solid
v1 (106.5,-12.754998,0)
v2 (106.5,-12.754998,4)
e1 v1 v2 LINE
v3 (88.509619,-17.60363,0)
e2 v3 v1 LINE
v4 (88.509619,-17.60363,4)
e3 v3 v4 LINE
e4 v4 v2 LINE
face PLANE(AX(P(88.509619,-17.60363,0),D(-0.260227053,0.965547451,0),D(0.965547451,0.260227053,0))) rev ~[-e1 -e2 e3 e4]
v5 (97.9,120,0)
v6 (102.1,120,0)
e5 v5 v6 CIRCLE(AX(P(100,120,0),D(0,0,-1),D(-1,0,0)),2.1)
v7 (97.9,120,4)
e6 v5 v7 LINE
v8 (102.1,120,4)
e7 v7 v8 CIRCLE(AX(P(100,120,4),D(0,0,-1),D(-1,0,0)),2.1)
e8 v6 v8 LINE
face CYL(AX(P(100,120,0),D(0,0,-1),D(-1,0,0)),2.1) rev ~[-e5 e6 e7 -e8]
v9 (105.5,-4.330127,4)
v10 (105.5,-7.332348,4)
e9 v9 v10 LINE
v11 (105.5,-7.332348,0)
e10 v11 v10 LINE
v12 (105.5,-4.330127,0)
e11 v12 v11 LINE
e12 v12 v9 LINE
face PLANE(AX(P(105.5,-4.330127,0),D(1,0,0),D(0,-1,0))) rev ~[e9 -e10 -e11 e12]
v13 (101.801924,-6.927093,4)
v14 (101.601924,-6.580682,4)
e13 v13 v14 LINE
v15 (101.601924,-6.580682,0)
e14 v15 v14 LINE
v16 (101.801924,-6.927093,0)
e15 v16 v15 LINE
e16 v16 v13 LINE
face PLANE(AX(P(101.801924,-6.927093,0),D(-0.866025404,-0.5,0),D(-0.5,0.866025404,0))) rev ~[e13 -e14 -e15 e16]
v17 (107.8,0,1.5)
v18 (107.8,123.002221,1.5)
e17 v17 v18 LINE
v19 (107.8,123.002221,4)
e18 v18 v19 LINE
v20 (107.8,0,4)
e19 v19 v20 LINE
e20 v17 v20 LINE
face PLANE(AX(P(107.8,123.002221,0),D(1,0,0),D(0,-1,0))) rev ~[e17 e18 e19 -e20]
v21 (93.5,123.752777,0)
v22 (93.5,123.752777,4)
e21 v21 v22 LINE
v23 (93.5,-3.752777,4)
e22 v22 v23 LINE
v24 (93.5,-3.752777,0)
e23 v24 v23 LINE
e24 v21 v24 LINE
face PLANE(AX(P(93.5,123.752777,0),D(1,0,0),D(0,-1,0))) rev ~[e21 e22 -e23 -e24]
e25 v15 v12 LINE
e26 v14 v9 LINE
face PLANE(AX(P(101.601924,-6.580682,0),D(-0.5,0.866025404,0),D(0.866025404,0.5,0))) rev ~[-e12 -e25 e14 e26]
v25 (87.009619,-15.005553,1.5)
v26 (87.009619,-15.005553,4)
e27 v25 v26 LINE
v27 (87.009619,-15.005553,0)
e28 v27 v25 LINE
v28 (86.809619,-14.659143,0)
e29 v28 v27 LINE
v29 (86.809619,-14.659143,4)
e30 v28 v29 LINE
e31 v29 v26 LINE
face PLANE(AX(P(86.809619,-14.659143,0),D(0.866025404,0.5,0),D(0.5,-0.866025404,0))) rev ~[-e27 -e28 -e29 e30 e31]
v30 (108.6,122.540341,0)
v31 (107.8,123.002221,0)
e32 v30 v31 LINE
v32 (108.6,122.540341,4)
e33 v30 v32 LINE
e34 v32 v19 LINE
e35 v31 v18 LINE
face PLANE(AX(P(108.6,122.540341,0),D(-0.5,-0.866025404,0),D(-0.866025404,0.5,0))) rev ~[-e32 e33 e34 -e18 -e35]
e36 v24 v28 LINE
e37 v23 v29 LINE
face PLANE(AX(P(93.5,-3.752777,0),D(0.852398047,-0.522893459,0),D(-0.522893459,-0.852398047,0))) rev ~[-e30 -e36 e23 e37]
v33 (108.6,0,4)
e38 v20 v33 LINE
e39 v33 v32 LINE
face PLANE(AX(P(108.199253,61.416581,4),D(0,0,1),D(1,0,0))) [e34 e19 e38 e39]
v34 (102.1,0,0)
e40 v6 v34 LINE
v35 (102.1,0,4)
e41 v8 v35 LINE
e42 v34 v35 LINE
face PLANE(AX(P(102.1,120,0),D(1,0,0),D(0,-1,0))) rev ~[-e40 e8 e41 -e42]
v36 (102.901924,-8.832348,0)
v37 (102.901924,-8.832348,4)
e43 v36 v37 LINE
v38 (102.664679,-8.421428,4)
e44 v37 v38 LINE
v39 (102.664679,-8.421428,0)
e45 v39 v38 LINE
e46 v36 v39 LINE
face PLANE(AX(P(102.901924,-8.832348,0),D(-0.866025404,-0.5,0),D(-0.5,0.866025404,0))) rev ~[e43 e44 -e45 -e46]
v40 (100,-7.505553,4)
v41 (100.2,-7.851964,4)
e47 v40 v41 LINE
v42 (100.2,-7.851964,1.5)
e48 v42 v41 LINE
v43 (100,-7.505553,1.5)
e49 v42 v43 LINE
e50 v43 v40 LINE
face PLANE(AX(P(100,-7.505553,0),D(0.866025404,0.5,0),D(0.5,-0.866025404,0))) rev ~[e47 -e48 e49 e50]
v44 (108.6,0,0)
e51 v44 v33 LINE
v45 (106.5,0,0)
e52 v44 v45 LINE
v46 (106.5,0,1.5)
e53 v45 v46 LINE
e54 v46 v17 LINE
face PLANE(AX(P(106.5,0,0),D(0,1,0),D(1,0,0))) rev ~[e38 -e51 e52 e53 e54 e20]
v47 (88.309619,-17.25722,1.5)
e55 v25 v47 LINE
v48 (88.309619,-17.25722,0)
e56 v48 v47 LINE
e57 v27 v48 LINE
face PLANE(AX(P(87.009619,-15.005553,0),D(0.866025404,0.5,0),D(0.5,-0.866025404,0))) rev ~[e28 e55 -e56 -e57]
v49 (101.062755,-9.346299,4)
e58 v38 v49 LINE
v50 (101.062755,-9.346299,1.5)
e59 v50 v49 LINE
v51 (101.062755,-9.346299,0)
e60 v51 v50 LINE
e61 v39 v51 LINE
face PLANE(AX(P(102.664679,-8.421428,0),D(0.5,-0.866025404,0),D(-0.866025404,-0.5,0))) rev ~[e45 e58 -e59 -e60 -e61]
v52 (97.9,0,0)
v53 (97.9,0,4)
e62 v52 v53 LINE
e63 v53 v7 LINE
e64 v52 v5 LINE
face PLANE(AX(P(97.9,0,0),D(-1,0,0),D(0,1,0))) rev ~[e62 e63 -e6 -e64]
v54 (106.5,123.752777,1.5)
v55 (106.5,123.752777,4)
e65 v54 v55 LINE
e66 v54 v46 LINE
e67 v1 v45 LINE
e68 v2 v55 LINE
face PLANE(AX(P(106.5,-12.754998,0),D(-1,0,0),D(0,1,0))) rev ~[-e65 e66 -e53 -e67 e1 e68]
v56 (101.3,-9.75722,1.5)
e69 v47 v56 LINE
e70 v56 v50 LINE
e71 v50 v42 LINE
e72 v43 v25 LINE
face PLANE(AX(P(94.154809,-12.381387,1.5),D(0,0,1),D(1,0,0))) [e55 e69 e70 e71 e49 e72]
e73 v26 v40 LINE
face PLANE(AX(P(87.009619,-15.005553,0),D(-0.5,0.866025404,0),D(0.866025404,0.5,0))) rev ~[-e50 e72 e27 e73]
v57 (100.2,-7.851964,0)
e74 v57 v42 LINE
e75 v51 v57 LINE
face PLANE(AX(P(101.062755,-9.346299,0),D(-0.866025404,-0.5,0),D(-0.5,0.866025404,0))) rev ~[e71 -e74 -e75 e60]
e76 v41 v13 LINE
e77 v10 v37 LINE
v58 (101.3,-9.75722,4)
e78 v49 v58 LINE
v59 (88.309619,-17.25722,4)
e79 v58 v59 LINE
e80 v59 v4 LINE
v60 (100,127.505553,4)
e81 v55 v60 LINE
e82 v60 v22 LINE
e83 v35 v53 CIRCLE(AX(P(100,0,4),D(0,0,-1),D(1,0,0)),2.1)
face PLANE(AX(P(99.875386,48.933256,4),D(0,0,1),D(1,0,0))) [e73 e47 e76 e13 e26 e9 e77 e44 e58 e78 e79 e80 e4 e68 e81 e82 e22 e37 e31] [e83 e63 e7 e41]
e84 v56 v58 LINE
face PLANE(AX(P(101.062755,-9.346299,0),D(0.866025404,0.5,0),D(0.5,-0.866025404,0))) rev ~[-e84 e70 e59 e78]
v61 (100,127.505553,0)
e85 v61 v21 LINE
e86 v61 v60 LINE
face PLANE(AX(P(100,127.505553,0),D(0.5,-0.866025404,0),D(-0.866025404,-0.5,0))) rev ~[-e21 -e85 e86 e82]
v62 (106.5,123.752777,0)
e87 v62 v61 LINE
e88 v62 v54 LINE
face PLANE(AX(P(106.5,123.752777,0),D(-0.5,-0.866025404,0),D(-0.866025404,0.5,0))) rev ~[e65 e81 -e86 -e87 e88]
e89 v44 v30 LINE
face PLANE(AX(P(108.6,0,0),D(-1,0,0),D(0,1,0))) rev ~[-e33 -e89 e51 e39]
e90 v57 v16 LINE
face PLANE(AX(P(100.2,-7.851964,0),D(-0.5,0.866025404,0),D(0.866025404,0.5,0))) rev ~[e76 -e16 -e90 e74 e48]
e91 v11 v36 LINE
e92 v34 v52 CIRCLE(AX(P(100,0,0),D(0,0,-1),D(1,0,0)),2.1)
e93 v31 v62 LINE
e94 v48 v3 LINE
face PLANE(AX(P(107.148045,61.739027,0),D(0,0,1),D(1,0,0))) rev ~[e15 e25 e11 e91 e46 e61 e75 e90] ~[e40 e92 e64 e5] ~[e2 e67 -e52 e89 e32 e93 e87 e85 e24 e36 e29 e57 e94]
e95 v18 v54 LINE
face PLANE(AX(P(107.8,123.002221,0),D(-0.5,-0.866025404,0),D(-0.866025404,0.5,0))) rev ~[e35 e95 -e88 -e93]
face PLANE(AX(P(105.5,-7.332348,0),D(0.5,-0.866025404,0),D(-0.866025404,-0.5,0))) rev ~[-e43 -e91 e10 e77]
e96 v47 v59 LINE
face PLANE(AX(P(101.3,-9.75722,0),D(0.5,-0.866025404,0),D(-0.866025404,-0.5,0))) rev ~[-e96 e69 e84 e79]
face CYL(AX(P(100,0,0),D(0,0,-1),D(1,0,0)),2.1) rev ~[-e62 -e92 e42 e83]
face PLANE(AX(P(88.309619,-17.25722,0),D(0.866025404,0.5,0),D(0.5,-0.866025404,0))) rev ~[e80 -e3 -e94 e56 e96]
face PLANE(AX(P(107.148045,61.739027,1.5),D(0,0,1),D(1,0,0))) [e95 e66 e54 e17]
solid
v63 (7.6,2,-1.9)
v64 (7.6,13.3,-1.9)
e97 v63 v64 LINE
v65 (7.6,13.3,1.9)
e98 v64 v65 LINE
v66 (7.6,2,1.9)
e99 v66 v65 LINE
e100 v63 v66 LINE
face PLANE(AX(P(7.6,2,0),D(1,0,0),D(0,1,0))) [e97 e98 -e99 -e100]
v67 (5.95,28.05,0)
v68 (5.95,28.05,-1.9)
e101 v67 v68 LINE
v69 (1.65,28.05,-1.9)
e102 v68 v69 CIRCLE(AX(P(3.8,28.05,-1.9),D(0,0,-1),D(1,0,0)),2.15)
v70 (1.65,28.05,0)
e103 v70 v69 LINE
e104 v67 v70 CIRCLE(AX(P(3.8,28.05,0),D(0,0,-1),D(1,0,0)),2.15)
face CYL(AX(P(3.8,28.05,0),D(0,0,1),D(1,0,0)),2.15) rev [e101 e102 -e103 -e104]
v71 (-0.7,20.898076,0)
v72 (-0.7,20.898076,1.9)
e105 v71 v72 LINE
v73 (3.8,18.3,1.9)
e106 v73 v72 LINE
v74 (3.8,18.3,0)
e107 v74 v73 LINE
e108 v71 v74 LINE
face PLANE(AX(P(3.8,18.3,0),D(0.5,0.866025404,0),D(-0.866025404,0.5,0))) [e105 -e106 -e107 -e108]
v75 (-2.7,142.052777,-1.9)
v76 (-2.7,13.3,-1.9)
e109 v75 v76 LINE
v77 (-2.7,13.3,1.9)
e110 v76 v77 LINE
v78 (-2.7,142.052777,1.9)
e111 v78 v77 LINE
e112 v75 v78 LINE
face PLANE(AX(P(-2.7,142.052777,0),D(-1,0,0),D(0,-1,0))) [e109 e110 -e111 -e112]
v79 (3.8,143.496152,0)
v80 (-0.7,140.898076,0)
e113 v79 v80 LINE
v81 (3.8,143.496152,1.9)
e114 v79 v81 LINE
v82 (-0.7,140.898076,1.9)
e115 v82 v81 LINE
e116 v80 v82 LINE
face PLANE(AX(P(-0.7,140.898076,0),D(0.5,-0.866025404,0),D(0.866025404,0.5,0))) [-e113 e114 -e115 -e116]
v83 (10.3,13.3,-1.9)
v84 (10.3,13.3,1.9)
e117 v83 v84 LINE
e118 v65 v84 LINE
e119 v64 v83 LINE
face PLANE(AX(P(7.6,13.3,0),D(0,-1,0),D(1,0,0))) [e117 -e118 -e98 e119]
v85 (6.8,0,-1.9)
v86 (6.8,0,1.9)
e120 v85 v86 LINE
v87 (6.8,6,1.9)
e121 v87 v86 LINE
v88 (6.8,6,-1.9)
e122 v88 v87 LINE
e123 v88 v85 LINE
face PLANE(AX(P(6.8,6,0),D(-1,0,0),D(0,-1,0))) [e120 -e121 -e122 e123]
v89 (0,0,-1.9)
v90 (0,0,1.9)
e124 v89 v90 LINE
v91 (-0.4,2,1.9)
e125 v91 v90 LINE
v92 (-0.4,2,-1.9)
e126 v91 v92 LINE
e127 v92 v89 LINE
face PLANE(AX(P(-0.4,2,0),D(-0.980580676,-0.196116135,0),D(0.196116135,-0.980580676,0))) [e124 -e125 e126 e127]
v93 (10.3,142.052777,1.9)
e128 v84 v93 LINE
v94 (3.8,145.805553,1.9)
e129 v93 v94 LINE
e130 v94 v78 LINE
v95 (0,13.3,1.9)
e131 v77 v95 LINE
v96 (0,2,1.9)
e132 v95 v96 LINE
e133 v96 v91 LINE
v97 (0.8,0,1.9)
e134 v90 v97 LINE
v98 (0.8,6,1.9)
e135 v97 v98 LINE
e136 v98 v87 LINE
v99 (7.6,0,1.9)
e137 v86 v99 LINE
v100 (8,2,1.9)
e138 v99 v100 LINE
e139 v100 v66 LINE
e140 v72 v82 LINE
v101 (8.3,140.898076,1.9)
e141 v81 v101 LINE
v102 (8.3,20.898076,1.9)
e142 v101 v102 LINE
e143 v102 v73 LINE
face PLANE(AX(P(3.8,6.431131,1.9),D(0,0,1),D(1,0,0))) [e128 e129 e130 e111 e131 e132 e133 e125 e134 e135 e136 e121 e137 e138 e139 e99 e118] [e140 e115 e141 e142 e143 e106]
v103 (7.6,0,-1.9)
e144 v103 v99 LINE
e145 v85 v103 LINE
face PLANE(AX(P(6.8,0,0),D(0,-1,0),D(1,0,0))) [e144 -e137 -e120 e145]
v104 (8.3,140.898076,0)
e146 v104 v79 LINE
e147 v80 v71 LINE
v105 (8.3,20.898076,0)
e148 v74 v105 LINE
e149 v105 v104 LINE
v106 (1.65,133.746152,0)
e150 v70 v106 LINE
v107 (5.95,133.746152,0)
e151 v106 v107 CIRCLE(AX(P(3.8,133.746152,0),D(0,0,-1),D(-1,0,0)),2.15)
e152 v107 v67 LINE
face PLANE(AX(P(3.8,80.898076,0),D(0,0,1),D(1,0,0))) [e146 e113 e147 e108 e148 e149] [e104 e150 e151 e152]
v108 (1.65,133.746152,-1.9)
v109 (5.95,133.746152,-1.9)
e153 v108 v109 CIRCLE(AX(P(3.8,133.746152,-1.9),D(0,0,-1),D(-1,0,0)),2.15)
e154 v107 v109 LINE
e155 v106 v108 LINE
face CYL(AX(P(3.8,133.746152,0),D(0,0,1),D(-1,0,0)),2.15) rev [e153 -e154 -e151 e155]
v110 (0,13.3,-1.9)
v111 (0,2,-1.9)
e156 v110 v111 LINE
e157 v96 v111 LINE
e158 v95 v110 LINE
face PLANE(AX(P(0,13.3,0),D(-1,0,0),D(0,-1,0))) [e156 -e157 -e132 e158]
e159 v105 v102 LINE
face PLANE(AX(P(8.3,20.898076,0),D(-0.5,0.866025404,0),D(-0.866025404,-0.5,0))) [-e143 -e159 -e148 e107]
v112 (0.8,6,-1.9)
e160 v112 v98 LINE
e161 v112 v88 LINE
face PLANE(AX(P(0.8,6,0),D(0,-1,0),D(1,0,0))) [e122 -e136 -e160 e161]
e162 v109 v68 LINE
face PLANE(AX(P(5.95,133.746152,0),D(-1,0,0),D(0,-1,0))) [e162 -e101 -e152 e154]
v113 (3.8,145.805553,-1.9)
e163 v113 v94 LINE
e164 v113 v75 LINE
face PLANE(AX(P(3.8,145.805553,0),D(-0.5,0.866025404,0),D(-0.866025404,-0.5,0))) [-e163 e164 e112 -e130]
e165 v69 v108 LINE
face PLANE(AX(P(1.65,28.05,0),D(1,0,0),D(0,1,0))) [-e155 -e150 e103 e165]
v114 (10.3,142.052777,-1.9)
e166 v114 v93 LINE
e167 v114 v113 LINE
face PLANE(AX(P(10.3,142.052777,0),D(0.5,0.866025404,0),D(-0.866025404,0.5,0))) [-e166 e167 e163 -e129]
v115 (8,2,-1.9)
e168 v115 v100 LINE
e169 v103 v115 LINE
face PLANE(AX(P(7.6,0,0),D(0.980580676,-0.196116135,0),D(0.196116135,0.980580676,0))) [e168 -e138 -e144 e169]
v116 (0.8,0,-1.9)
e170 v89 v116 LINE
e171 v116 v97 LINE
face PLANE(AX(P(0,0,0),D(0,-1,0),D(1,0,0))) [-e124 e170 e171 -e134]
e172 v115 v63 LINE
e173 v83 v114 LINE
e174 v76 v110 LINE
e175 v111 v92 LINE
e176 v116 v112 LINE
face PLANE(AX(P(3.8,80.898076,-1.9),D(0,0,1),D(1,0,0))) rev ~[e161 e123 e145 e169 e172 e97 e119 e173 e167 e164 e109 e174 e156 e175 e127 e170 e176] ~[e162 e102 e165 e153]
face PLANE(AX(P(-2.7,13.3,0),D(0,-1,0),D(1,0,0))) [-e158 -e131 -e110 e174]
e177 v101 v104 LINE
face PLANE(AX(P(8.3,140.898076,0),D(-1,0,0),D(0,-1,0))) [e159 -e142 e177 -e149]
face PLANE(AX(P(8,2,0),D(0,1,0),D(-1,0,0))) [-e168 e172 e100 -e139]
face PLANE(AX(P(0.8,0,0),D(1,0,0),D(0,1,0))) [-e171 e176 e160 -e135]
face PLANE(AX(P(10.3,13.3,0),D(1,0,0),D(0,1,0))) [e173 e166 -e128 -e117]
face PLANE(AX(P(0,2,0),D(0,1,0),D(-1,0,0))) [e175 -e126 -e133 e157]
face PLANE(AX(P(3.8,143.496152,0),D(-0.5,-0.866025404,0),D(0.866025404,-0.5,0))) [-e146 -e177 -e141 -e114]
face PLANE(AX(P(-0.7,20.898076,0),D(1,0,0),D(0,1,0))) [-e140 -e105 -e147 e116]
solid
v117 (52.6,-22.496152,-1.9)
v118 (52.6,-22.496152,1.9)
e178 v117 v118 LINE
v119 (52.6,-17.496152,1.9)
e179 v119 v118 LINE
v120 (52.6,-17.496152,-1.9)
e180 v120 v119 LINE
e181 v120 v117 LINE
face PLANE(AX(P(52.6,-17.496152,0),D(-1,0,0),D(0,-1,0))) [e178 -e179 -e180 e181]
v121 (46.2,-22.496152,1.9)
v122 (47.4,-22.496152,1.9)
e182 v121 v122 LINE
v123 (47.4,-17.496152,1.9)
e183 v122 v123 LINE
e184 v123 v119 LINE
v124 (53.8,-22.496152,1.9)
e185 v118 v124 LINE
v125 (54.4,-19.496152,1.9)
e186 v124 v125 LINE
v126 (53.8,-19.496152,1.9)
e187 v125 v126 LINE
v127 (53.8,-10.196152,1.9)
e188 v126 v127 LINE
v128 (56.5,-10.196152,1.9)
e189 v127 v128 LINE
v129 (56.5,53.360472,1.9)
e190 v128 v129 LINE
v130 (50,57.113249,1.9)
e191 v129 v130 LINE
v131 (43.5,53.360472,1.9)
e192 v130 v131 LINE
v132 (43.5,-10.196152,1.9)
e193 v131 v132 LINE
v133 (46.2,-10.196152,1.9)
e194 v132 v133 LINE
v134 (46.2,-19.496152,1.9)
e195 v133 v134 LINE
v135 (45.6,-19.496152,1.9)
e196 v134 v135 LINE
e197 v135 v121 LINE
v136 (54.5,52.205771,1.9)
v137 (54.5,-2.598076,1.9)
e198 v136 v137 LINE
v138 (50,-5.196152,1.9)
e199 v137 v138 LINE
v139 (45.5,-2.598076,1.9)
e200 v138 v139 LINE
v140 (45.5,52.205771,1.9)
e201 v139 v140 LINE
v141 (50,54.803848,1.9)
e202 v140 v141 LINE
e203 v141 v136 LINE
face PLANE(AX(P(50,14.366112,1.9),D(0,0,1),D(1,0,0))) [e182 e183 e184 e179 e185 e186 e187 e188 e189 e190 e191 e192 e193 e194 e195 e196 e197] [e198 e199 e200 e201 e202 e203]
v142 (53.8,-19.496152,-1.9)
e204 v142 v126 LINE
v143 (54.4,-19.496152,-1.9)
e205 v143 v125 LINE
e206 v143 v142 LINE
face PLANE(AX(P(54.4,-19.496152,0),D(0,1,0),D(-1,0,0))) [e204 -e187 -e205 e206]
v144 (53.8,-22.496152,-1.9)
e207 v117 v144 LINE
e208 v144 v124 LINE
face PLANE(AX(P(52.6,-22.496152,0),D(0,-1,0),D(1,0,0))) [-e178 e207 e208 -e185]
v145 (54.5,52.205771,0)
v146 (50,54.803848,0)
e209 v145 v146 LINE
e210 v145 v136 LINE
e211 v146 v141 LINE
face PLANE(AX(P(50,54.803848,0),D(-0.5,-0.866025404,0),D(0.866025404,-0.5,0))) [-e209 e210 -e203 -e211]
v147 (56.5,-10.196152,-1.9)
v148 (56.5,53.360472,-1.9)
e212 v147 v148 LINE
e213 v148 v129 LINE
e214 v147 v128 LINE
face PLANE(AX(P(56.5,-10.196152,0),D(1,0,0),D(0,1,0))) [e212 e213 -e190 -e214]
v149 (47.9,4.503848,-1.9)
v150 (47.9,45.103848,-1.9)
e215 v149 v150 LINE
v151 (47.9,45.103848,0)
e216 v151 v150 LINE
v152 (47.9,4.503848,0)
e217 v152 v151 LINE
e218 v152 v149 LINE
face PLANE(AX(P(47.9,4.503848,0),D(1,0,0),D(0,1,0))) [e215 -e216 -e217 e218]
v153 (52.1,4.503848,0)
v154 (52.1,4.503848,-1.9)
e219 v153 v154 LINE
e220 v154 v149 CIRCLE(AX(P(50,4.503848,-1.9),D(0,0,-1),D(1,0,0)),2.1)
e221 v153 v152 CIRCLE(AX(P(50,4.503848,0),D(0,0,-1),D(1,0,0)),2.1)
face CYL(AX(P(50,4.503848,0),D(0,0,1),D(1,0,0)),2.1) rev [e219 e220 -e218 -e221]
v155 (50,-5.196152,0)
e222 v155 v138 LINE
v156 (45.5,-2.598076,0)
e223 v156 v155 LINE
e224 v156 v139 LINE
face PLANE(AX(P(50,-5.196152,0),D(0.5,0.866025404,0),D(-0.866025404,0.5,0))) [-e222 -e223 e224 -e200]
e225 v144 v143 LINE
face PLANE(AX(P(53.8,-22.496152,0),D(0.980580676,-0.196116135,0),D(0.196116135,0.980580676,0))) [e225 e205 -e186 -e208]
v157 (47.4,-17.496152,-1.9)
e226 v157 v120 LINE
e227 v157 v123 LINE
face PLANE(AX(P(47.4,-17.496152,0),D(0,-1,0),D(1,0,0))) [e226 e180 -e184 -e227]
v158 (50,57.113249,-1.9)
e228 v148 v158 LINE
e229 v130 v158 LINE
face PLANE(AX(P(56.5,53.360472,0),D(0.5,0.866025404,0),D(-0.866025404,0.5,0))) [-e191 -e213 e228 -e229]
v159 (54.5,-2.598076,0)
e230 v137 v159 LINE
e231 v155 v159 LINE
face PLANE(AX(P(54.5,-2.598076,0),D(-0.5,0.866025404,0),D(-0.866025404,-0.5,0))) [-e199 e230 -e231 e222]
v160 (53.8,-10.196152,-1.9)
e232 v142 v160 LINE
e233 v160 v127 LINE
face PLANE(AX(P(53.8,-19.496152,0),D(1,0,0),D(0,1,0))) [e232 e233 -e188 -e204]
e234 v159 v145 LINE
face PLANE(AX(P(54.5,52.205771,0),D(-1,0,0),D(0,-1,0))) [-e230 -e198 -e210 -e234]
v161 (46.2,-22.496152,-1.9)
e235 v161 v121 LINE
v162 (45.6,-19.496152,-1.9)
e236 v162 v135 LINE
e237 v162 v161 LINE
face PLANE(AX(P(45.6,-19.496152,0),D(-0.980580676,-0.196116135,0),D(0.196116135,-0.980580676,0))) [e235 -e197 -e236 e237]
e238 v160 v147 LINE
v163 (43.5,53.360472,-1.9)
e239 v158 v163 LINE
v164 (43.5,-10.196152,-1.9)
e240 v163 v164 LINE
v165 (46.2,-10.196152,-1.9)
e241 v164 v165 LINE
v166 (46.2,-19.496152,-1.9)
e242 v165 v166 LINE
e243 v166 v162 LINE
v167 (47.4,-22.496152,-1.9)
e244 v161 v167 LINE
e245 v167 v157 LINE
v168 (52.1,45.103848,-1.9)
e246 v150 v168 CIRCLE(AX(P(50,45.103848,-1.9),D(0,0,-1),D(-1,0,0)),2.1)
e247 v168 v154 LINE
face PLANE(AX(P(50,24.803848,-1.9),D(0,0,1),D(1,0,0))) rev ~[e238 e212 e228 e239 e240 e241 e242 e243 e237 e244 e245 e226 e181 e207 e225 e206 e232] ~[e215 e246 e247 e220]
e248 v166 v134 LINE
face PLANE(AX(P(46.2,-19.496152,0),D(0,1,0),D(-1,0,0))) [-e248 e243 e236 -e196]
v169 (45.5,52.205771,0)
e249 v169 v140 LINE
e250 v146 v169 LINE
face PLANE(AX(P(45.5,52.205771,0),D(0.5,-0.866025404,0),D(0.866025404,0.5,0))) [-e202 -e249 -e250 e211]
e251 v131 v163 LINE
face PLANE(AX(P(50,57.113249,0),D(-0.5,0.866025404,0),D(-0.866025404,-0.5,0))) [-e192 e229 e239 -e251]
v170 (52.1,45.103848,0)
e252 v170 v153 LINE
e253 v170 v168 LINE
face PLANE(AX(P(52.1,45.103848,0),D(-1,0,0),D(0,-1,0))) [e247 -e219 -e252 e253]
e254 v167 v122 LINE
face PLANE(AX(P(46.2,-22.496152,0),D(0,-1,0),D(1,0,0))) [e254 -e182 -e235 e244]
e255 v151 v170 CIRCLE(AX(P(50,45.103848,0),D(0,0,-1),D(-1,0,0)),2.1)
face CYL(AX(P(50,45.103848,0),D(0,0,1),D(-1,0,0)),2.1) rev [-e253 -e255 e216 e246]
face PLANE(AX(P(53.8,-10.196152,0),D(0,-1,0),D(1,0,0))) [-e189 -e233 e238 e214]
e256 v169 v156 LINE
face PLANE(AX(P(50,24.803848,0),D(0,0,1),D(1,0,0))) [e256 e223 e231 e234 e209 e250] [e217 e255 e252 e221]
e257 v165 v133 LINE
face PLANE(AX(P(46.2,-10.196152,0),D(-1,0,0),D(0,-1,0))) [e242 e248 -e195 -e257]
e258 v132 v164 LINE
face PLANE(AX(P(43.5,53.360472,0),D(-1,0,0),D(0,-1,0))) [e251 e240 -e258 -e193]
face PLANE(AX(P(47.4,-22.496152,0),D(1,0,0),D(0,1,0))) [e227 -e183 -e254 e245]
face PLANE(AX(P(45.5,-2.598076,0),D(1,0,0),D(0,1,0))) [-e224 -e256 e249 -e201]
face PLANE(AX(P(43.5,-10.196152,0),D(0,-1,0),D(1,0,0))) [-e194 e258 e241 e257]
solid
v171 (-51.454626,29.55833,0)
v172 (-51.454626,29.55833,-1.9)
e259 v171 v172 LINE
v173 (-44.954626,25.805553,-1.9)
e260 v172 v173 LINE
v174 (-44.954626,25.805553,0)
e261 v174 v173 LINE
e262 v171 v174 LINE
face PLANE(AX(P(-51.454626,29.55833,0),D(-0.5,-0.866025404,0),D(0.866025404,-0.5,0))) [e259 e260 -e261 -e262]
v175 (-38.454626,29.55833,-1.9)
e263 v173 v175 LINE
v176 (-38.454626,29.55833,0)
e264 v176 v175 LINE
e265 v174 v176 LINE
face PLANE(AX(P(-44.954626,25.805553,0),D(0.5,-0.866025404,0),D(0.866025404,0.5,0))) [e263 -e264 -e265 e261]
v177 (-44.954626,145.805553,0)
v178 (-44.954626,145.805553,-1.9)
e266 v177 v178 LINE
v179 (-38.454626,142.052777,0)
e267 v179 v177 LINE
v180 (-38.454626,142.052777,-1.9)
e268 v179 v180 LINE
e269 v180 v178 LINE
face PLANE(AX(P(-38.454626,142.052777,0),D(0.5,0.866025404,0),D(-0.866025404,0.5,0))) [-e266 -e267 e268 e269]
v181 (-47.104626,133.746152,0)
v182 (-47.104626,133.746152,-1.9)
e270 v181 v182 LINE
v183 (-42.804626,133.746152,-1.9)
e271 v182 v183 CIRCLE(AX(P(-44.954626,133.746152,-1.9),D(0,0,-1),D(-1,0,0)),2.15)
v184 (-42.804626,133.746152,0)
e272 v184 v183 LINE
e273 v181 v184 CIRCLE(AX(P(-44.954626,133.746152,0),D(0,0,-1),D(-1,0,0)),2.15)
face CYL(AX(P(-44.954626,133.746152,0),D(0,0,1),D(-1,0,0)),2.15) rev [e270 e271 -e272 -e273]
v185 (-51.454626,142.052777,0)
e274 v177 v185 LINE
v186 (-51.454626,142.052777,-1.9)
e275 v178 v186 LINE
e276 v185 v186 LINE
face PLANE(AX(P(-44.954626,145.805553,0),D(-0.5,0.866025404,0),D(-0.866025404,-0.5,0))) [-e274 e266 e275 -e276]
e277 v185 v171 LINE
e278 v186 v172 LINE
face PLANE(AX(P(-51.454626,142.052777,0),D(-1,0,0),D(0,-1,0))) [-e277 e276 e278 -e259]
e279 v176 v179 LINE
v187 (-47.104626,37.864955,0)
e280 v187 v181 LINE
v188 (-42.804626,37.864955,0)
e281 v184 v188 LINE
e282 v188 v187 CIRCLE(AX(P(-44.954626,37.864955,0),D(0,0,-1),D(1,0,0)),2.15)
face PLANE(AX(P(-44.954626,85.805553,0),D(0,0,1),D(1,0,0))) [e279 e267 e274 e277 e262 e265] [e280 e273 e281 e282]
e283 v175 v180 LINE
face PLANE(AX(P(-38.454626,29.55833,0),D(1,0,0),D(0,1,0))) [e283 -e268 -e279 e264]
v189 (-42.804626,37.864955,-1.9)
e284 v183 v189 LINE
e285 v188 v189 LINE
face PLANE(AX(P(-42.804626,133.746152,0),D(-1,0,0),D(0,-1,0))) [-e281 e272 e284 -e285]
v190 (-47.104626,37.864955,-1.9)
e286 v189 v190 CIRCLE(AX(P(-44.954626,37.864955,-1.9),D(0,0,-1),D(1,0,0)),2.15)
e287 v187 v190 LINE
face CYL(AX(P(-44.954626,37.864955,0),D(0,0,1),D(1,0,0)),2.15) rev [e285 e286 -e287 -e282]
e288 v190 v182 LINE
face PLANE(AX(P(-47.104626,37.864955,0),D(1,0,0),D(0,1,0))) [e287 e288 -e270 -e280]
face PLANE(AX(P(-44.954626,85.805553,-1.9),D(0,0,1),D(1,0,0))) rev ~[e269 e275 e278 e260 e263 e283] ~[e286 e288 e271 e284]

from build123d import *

# Parameters (mm, degrees)
F1_DEPTH = 1.9
F2_DEPTH = 1.9
F3_DEPTH = 4
F4_DEPTH = 1.5


# Not quite as in the source:
# - a feature names something its author has since deleted; it is built from what else it names


with BuildPart() as f1:
    # F0 (on Top) → F1 (new body, symmetric)
    with BuildSketch(Plane.XY):
        Polygon((-0.4, 2), (0, 0), (0.8, 0), (0.8, 6), (3.8, 6), (6.8, 6), (6.8, 0), (7.6, 0), (8, 2), (7.6, 2), (7.6, 13.3), (0, 13.3), (0, 2), align=None)
        Polygon((-2.7, 13.3), (0, 13.3), (7.6, 13.3), (10.3, 13.3), (10.3, 17.3), (-2.7, 17.3), align=None)
        Polygon((-2.7, 26.0947383738), (-2.7, 17.3), (10.3, 17.3), (10.3, 46.0942286341), (10.3, 135.7019237886), (10.3, 142.0527767497), (3.8, 145.8055534995), (-2.7, 142.0527767497), (-2.7, 135.7019237886), align=None)
        Polygon((8.3, 135.7019237886), (8.3, 26.0942286341), (8.3, 20.8980762114), (3.8, 18.3), (-0.7, 20.8980762114), (-0.7, 46.0947383738), (-0.7, 135.7019237886), (-0.7, 140.8980762114), (3.8, 143.4961524227), (8.3, 140.8980762114), align=None, mode=Mode.SUBTRACT)
    extrude(amount=F1_DEPTH, both=True)

    # F0 (on Top) → F2 (join)
    with BuildSketch(Plane.XY):
        Polygon((8.3, 20.8980762114), (8.3, 26.0942286341), (8.3, 135.7019237886), (8.3, 140.8980762114), (3.8, 143.4961524227), (-0.7, 140.8980762114), (-0.7, 135.7019237886), (-0.7, 46.0947383738), (-0.7, 20.8980762114), (3.8, 18.3), align=None)
        with BuildLine():
            ThreePointArc((5.95, 28.05), (3.8, 25.9), (1.65, 28.05))
            Line((1.65, 28.05), (1.65, 133.7461524227))
            ThreePointArc((1.65, 133.7461524227), (3.8, 135.8961524227), (5.95, 133.7461524227))
            Line((5.95, 133.7461524227), (5.95, 28.05))
        make_face(mode=Mode.SUBTRACT)
    extrude(amount=-F2_DEPTH)


with BuildPart() as f1b:
    # F0 (on Top) → F1, piece 2 (new body, symmetric)
    with BuildSketch(Plane.XY):
        Polygon((43.5, 24.8038475773), (43.5, -10.1961524227), (46.2, -10.1961524227), (46.2, -19.4961524227), (45.6, -19.4961524227), (46.2, -22.4961524227), (47.4, -22.4961524227), (47.4, -17.4961524227), (52.6, -17.4961524227), (52.6, -22.4961524227), (53.8, -22.4961524227), (54.4, -19.4961524227), (53.8, -19.4961524227), (53.8, -10.1961524227), (55.7, -10.1961524227), (56.5, -10.1961524227), (56.5, 24.8038475773), (56.5, 53.3604719043), (50, 57.1132486541), (43.5, 53.3604719043), align=None)
        Polygon((50, -5.1961524227), (45.5, -2.5980762114), (45.5, 2.5980762114), (45.5, 24.8038475773), (45.5, 47.0096189432), (45.5, 52.2057713659), (50, 54.8038475773), (54.5, 52.2057713659), (54.5, 47.0096189432), (54.5, 24.8038475773), (54.5, 2.5980762114), (54.5, -2.5980762114), align=None, mode=Mode.SUBTRACT)
    extrude(amount=F1_DEPTH, both=True)

    # F0 (on Top) → F2, piece 3 (join)
    with BuildSketch(Plane.XY):
        Polygon((45.5, 2.5980762114), (45.5, -2.5980762114), (50, -5.1961524227), (54.5, -2.5980762114), (54.5, 2.5980762114), (54.5, 24.8038475773), (54.5, 47.0096189432), (54.5, 52.2057713659), (50, 54.8038475773), (45.5, 52.2057713659), (45.5, 47.0096189432), (45.5, 24.8038475773), align=None)
        with BuildLine():
            ThreePointArc((52.1, 4.5038475773), (50, 2.4038475773), (47.9, 4.5038475773))
            Line((47.9, 4.5038475773), (47.9, 24.8038475773))
            Line((47.9, 24.8038475773), (47.9, 45.1038475773))
            ThreePointArc((47.9, 45.1038475773), (50, 47.2038475773), (52.1, 45.1038475773))
            Line((52.1, 45.1038475773), (52.1, 24.8038475773))
            Line((52.1, 24.8038475773), (52.1, 4.5038475773))
        make_face(mode=Mode.SUBTRACT)
    extrude(amount=-F2_DEPTH)


with BuildPart() as f2:
    # F0 (on Top) → F2, piece 2 (new body)
    with BuildSketch(Plane.XY):
        Polygon((-38.4546260238, 35.9091832103), (-38.4546260238, 85.8055534995), (-38.4546260238, 135.7019237886), (-38.4546260238, 142.0527767497), (-44.9546260238, 145.8055534995), (-51.4546260238, 142.0527767497), (-51.4546260238, 135.7019237886), (-51.4546260238, 85.8055534995), (-51.4546260238, 35.9091832103), (-51.4546260238, 29.5583302492), (-44.9546260238, 25.8055534995), (-38.4546260238, 29.5583302492), align=None)
        Polygon((-44.9546260238, 143.4961524227), (-40.4546260238, 140.8980762114), (-40.4546260238, 135.7019237886), (-40.4546260238, 85.8055534995), (-40.4546260238, 35.9091832103), (-40.4546260238, 30.7130307876), (-44.9546260238, 28.1149545762), (-49.4546260238, 30.7130307876), (-49.4546260238, 35.9091832103), (-49.4546260238, 85.8055534995), (-49.4546260238, 135.7019237886), (-49.4546260238, 140.8980762114), align=None, mode=Mode.SUBTRACT)
        Polygon((-40.4546260238, 135.7019237886), (-40.4546260238, 140.8980762114), (-44.9546260238, 143.4961524227), (-49.4546260238, 140.8980762114), (-49.4546260238, 135.7019237886), (-49.4546260238, 85.8055534995), (-49.4546260238, 35.9091832103), (-49.4546260238, 30.7130307876), (-44.9546260238, 28.1149545762), (-40.4546260238, 30.7130307876), (-40.4546260238, 35.9091832103), (-40.4546260238, 85.8055534995), align=None)
        with BuildLine():
            ThreePointArc((-47.1046260238, 133.7461524227), (-44.9546260238, 135.8961524227), (-42.8046260238, 133.7461524227))
            Line((-42.8046260238, 133.7461524227), (-42.8046260238, 85.8055534995))
            Line((-42.8046260238, 85.8055534995), (-42.8046260238, 37.8649545762))
            ThreePointArc((-42.8046260238, 37.8649545762), (-44.9546260238, 35.7149545762), (-47.1046260238, 37.8649545762))
            Line((-47.1046260238, 37.8649545762), (-47.1046260238, 85.8055534995))
            Line((-47.1046260238, 85.8055534995), (-47.1046260238, 133.7461524227))
        make_face(mode=Mode.SUBTRACT)
    extrude(amount=-F2_DEPTH)


with BuildPart() as f3:
    # F0 (on Top) → F3 (new body)
    with BuildSketch(Plane.XY):
        Polygon((93.5, 3.7527767497), (93.5, -3.7527767497), (100, -7.5055534995), (100.2, -7.851963661), (101.8019237886, -6.9270925304), (101.6019237886, -6.5806823689), (105.5, -4.3301270189), (105.5, -4.7920072343), (105.5, -6.7844546003), (105.5, -7.3323484187), (102.9019237886, -8.8323484187), (102.664678806, -8.4214280549), (101.0627550173, -9.3462991855), (101.3, -9.7572195493), (88.3096189432, -17.2572195493), (88.5096189432, -17.6036297108), (106.5, -12.7549981495), (106.5, -6.7549981495), (106.5, -6.2071043311), (106.5, -4.2146569651), (106.5, 0), (106.5, 3.7527767497), (106.5, 60), (106.5, 116.2472232503), (106.5, 123.7527767497), (100, 127.5055534995), (93.5, 123.7527767497), (93.5, 116.2472232503), (93.5, 60), align=None)
        with BuildLine():
            ThreePointArc((102.1, 0), (100, -2.1), (97.9, 0))
            Line((97.9, 0), (97.9, 60))
            Line((97.9, 60), (97.9, 120))
            ThreePointArc((97.9, 120), (100, 122.1), (102.1, 120))
            Line((102.1, 120), (102.1, 60))
            Line((102.1, 60), (102.1, 0))
        make_face(mode=Mode.SUBTRACT)
        Polygon((100, -7.5055534995), (93.5, -3.7527767497), (86.8096189432, -14.659143338), (87.0096189432, -15.0055534995), align=None)
    extrude(amount=F3_DEPTH)



with BuildPart() as f3b:
    # F0 (on Top) → F3, piece 2 (new body)
    with BuildSketch(Plane.XY):
        Polygon((108.6, 122.5403411844), (107.8, 123.0022213998), (107.8, 0), (108.6, 0), align=None)
    extrude(amount=F3_DEPTH)


with BuildPart() as f3_1:
    add(f3.part)

    add(f3b.part)  # F4 merges F3b
    # F0 (on Top) → F4 (join)
    with BuildSketch(Plane.XY):
        Polygon((107.8, 123.0022213998), (106.5, 123.7527767497), (106.5, 116.2472232503), (106.5, 60), (106.5, 3.7527767497), (106.5, 0), (107.8, 0), align=None)
        Polygon((100.2, -7.851963661), (100, -7.5055534995), (87.0096189432, -15.0055534995), (88.3096189432, -17.2572195493), (101.3, -9.7572195493), (101.0627550173, -9.3462991855), align=None)
    extrude(amount=F4_DEPTH)


solid = Compound([f1.part, f1b.part, f2.part, f3_1.part])
